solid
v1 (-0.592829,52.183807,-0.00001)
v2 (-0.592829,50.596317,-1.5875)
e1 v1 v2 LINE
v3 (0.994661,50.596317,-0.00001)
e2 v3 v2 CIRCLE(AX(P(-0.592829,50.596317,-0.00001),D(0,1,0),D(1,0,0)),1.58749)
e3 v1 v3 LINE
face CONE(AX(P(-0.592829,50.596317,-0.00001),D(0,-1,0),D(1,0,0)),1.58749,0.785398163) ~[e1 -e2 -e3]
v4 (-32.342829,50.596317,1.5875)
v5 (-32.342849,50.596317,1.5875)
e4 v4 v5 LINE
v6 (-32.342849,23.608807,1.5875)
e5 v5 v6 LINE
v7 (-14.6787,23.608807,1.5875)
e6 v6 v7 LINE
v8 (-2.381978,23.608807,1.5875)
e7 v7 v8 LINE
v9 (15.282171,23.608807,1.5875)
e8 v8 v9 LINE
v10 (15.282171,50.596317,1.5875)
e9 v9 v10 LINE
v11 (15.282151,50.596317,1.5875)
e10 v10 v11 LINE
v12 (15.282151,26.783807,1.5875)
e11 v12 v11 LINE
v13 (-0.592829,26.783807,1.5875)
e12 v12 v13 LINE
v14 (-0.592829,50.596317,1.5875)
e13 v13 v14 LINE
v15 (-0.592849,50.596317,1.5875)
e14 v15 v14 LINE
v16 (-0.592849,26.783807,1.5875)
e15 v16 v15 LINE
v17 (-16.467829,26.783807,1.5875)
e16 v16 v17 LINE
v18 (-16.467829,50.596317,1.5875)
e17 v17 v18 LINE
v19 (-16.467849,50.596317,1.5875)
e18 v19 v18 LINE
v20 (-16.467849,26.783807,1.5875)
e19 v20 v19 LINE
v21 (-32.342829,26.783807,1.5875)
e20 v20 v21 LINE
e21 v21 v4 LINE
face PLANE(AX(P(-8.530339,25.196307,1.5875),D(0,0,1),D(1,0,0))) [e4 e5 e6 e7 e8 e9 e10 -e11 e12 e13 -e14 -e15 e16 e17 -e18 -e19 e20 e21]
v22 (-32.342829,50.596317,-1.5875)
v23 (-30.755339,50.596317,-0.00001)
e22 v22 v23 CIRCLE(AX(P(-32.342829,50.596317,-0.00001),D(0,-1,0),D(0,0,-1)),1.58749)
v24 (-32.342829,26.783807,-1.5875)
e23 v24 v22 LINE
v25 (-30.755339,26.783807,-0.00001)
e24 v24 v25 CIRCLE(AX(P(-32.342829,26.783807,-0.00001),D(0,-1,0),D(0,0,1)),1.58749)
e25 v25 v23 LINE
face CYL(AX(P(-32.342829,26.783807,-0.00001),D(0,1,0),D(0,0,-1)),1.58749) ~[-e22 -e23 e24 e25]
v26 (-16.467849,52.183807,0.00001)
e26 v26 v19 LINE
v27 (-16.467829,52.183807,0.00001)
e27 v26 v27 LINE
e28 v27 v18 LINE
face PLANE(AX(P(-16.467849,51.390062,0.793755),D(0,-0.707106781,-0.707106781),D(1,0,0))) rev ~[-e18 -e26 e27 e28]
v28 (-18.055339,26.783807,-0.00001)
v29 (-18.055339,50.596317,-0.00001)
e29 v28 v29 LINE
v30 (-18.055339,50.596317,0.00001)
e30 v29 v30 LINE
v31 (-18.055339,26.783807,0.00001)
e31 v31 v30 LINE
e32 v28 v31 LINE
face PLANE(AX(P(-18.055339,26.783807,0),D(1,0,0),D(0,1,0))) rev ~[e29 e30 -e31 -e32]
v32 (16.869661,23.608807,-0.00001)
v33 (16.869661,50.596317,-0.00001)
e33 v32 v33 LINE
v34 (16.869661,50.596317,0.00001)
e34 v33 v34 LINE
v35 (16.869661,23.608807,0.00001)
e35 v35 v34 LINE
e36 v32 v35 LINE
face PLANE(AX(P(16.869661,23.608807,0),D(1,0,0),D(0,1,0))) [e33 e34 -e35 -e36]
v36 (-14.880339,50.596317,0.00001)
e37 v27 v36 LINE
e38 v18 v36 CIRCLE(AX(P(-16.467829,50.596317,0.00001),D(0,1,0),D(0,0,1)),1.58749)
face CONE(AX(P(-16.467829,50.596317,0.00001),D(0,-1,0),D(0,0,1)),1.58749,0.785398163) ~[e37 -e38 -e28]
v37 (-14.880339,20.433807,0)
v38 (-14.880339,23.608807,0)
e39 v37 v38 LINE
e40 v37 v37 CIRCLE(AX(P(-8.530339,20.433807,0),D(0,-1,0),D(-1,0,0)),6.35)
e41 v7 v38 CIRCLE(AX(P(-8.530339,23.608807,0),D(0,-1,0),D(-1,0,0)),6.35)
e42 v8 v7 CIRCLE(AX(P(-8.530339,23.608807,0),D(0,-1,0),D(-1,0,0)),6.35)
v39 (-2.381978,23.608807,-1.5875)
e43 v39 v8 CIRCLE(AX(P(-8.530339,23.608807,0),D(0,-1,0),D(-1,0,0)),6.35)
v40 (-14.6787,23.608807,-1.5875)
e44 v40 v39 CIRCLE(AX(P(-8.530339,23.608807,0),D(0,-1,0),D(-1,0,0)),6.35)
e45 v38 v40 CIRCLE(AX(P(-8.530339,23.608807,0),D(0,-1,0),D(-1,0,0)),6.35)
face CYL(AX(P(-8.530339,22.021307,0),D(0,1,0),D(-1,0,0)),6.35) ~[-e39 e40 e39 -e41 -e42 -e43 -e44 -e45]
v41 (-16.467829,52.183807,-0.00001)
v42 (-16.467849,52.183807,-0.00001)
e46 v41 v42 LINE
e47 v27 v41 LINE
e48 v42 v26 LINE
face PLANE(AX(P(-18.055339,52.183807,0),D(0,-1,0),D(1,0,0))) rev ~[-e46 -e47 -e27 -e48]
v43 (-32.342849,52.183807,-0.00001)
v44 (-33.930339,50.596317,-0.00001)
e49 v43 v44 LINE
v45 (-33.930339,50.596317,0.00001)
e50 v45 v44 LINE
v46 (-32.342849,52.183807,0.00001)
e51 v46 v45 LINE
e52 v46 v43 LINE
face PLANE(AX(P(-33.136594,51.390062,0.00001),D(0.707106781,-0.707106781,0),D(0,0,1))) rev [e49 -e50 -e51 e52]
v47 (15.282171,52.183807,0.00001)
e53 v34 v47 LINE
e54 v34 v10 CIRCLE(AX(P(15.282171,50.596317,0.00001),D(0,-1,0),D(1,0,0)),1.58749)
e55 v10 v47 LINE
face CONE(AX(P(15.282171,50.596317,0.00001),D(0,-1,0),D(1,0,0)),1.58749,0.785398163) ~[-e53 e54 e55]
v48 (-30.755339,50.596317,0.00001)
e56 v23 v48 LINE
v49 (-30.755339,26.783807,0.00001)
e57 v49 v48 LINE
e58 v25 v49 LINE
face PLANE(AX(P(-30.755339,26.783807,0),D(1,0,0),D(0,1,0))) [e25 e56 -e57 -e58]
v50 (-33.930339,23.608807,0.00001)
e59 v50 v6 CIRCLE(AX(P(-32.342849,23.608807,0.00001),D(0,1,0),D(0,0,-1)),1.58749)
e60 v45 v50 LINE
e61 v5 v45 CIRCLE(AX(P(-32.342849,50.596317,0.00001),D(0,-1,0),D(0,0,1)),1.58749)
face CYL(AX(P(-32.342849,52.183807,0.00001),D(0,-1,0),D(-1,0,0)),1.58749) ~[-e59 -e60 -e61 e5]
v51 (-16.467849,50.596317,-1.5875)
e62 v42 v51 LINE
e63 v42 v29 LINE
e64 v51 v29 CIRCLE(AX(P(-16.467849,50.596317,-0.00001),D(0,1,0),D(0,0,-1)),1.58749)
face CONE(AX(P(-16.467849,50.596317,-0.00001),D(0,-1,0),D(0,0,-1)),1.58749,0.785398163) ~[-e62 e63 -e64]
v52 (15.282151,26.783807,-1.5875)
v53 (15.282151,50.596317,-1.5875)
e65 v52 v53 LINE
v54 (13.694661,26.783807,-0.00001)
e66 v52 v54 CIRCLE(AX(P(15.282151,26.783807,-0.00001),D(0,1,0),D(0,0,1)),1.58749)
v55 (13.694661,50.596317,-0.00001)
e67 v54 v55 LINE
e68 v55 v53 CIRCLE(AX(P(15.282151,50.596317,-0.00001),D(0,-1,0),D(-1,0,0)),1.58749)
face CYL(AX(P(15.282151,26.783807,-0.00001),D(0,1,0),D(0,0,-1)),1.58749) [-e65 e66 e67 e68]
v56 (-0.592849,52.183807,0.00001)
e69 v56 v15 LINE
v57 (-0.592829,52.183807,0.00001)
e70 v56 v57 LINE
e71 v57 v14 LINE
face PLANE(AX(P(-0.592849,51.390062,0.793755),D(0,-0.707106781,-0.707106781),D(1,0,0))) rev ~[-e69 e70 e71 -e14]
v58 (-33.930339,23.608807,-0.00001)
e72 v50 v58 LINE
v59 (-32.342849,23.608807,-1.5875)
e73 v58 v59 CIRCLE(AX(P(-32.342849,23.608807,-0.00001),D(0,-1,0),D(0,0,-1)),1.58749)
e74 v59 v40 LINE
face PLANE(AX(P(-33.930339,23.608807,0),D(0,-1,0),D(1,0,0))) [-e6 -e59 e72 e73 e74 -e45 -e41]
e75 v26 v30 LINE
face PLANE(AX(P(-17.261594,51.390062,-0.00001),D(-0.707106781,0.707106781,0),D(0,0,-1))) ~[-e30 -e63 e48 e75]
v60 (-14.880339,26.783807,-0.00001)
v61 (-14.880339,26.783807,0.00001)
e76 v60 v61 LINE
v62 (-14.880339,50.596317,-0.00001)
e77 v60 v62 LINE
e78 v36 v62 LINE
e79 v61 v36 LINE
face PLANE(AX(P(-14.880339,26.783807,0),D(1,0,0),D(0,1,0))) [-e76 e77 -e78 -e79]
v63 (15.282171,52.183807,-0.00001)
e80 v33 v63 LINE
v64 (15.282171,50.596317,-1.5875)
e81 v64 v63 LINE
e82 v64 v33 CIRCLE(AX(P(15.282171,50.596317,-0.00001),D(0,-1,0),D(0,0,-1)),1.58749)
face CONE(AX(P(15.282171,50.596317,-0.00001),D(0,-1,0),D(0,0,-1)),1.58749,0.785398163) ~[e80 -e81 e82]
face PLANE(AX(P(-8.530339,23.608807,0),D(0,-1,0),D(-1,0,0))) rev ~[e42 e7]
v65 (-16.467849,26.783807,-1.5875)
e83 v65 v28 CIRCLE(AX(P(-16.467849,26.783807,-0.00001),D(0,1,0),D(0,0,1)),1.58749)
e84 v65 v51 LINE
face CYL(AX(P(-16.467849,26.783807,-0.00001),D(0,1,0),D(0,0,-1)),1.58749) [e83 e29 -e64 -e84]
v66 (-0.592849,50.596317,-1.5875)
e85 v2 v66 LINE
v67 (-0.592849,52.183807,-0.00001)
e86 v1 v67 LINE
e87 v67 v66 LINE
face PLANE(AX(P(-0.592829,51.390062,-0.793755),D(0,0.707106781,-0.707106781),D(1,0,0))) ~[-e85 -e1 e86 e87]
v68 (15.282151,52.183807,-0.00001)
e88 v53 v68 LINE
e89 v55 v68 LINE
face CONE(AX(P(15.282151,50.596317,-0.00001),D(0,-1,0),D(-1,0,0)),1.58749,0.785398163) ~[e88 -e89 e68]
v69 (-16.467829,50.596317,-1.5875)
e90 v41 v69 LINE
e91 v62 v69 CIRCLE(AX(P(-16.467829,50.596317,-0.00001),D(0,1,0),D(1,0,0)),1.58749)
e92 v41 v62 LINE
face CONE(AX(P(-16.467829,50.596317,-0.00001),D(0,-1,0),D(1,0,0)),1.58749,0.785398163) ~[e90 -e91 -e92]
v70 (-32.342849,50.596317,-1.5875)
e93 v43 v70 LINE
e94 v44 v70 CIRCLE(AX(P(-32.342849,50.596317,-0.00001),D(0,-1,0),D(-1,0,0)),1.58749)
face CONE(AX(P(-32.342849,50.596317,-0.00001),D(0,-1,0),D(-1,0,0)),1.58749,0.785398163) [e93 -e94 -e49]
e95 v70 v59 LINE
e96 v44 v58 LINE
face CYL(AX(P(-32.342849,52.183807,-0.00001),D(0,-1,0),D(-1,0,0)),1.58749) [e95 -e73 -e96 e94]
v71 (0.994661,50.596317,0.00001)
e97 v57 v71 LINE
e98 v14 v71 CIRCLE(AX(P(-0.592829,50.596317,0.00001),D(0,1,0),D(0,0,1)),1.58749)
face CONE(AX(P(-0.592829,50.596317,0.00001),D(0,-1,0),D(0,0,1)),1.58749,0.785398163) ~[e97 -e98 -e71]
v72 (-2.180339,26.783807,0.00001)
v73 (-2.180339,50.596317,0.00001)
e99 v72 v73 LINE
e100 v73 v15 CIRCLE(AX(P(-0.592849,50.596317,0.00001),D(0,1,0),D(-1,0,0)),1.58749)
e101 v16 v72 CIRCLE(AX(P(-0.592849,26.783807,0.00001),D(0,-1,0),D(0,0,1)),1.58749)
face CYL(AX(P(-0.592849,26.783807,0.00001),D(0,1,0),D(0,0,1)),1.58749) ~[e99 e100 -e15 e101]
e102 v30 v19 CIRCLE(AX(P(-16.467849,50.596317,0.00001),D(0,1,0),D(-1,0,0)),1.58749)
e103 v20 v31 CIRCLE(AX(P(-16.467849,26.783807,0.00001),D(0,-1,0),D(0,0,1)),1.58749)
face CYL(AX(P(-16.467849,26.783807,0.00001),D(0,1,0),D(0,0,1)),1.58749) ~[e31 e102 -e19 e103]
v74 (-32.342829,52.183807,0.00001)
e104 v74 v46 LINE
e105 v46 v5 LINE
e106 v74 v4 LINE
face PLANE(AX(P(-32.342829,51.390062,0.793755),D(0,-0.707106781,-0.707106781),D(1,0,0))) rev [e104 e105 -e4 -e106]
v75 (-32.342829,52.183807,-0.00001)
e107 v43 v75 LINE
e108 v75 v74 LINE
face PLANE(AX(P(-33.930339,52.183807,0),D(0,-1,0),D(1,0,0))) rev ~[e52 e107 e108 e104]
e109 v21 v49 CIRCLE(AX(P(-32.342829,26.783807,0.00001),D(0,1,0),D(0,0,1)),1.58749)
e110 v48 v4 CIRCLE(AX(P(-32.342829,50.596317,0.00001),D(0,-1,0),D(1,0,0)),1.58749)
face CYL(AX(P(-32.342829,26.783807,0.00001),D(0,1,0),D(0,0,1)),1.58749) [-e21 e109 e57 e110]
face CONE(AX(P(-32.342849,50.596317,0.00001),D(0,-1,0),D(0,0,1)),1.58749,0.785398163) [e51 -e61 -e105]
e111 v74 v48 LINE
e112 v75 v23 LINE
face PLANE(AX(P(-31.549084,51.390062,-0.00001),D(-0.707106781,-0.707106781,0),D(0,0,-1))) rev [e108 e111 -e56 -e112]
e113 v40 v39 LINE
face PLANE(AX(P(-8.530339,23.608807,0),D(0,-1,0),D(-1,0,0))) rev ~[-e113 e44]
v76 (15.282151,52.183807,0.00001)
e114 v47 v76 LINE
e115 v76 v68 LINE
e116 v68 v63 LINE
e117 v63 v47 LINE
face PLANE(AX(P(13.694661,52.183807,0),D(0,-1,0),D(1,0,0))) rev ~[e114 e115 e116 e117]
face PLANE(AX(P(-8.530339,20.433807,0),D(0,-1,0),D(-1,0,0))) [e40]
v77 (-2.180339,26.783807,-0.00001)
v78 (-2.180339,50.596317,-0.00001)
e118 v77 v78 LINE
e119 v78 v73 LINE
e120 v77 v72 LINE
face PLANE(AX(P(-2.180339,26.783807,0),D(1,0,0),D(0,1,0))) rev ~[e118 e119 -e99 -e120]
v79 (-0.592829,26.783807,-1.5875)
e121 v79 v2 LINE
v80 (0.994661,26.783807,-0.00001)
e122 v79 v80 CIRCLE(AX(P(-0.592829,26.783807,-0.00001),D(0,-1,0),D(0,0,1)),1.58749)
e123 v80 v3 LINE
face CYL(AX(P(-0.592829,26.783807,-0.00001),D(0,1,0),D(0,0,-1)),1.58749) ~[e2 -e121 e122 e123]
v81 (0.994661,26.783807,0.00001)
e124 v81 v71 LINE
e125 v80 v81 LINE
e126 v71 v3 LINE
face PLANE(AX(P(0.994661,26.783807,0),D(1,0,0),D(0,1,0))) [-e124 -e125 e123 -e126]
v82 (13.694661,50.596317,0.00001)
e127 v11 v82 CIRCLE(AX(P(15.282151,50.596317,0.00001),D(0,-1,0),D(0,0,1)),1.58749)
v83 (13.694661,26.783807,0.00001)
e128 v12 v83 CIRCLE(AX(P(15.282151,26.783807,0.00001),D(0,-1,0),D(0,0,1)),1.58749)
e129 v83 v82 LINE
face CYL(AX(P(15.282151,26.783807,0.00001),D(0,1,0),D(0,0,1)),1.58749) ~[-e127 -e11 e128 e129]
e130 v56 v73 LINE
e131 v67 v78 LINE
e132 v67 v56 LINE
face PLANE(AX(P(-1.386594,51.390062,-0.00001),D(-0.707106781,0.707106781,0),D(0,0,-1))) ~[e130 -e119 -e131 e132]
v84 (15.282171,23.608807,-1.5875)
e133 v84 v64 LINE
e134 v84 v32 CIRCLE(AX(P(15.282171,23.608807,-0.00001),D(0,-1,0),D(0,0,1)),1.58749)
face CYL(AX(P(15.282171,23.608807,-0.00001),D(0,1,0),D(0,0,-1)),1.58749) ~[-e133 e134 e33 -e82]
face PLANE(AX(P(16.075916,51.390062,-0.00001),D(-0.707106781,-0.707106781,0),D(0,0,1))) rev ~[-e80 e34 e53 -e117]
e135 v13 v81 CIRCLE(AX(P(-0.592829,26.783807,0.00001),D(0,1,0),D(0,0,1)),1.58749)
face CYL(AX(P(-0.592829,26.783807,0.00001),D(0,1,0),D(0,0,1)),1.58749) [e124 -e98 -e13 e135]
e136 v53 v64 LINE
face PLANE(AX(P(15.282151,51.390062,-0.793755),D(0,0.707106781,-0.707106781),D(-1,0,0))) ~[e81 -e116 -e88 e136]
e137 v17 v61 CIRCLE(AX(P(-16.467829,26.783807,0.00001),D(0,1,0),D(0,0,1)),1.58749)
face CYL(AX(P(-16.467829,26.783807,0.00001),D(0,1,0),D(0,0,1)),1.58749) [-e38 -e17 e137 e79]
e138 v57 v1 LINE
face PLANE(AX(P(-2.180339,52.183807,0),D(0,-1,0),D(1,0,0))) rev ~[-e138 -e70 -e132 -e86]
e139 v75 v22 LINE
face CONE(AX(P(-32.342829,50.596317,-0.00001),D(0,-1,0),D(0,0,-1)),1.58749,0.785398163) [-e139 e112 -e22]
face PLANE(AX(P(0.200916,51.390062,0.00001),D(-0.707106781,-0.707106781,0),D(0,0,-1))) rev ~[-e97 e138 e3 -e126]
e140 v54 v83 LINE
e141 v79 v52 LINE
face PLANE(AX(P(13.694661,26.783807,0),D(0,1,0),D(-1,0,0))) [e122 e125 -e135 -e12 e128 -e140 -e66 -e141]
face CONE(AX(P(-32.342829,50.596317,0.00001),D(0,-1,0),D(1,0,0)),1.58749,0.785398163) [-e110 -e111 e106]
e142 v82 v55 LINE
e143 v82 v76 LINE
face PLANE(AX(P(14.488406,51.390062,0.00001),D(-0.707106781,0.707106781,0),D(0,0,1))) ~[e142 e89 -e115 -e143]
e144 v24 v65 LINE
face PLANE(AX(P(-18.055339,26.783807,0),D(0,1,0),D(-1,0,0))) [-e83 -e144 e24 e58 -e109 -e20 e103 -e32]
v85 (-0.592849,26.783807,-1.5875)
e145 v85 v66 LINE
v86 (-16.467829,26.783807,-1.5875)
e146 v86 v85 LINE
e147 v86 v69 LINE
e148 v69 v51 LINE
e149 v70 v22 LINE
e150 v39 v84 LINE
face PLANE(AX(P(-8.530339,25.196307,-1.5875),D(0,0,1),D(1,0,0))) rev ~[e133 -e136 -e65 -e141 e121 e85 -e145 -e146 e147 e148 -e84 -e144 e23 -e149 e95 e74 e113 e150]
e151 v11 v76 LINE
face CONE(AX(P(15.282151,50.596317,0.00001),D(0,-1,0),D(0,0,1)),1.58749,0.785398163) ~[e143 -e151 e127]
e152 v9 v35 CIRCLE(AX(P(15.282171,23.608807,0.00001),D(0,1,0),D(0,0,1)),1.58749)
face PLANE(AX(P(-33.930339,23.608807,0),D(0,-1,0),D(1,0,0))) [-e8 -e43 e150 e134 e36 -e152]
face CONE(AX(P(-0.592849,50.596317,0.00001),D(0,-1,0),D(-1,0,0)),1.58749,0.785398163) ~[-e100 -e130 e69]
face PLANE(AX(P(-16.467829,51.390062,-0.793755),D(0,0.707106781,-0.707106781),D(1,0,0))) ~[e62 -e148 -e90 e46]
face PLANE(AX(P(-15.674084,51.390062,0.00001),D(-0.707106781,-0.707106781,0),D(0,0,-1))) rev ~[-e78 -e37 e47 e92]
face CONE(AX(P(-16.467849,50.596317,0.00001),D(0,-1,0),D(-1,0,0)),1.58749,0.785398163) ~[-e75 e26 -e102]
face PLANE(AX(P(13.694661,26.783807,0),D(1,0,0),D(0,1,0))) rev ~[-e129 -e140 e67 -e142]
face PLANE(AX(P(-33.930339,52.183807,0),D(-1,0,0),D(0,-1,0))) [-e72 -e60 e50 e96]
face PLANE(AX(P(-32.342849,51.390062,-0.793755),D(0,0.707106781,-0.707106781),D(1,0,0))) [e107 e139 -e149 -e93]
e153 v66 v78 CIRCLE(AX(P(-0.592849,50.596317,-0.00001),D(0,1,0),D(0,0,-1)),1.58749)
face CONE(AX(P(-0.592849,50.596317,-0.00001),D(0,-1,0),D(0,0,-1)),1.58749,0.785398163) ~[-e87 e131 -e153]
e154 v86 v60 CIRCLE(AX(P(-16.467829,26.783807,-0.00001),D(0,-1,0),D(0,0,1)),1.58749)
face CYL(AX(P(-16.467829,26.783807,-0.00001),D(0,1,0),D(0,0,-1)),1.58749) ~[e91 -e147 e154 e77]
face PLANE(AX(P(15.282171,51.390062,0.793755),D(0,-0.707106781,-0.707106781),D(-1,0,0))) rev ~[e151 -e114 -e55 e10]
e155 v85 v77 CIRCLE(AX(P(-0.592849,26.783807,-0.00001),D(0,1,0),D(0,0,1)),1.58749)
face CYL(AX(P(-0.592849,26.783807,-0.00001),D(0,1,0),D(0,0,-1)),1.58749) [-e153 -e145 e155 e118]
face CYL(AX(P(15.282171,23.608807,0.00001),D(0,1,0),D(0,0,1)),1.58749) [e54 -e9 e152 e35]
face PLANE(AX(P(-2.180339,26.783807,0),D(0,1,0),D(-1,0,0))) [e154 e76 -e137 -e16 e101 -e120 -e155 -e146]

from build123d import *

# Parameters (mm, degrees)
F0_W     = 6.35
F0_H     = 3.175
F0_W_2   = 3.175
F0_H_2   = 25.4
F2_DEPTH = 1.5875
F3_R     = 1.58749
F4_SIZE  = 1.58749


# Not quite as in the source:
# - a fillet or chamfer is up to 0.001 mm smaller than in the source, because OpenCascade refuses the exact size


with BuildPart() as f1:
    # F0 (on Top) → F1 (revolve)
    with BuildSketch(Plane.XY):
        with Locations((-11.7053389192, 22.0213071685)):
            Rectangle(F0_W, F0_H)
    revolve(axis=Axis((-8.5303389192, 22.0213071685, 0), (0, -1, 0)))

    # F0 (on Top) → F2 (join, symmetric)
    with BuildSketch(Plane.XY):
        Polygon((-33.9303389192, 23.6088071685), (-14.8803389192, 23.6088071685), (-8.5303389192, 23.6088071685), (-2.1803389192, 23.6088071685), (16.8696610808, 23.6088071685), (16.8696610808, 26.7838071685), (13.6946610808, 26.7838071685), (0.9946610808, 26.7838071685), (-2.1803389192, 26.7838071685), (-8.5303389192, 26.7838071685), (-14.8803389192, 26.7838071685), (-18.0553389192, 26.7838071685), (-30.7553389192, 26.7838071685), (-33.9303389192, 26.7838071685), align=None)
        with Locations((-32.3428389192, 39.4838071685)):
            Rectangle(F0_W_2, F0_H_2)
        with Locations((-16.4678389192, 39.4838071685)):
            Rectangle(F0_W_2, F0_H_2)
        with Locations((-0.5928389192, 39.4838071685)):
            Rectangle(F0_W_2, F0_H_2)
        with Locations((15.2821610808, 39.4838071685)):
            Rectangle(F0_W_2, F0_H_2)
    extrude(amount=F2_DEPTH, both=True)

    # F3 (radius 1.5875 in the source; OpenCascade refuses exactly that, so slightly less here)
    f3_edges = [f1.edges().sort_by_distance(p)[0] for p in [
        (-33.930339, 37.896307, 1.5875),
        (-33.930339, 37.896307, -1.5875),
        (-30.755339, 39.483807, 1.5875),
        (-30.755339, 39.483807, -1.5875),
        (-18.055339, 39.483807, 1.5875),
        (-18.055339, 39.483807, -1.5875),
        (-14.880339, 39.483807, 1.5875),
        (-14.880339, 39.483807, -1.5875),
        (-2.180339, 39.483807, 1.5875),
        (-2.180339, 39.483807, -1.5875),
        (0.994661, 39.483807, -1.5875),
        (0.994661, 39.483807, 1.5875),
        (16.869661, 37.896307, -1.5875),
        (16.869661, 37.896307, 1.5875),
        (13.694661, 39.483807, 1.5875),
        (13.694661, 39.483807, -1.5875),
    ]]
    fillet(f3_edges, radius=F3_R)

    # F4 (size 1.5875 in the source; OpenCascade refuses exactly that, so slightly less here)
    f4_edges = [f1.edges().sort_by_distance(p)[0] for p in [
        (-33.465374, 52.183807, -1.122535),
        (-17.590374, 52.183807, -1.122535),
        (-1.715374, 52.183807, -1.122535),
        (16.404696, 52.183807, -1.122535),
    ]]
    chamfer(f4_edges, length=F4_SIZE)


solid = f1.part
